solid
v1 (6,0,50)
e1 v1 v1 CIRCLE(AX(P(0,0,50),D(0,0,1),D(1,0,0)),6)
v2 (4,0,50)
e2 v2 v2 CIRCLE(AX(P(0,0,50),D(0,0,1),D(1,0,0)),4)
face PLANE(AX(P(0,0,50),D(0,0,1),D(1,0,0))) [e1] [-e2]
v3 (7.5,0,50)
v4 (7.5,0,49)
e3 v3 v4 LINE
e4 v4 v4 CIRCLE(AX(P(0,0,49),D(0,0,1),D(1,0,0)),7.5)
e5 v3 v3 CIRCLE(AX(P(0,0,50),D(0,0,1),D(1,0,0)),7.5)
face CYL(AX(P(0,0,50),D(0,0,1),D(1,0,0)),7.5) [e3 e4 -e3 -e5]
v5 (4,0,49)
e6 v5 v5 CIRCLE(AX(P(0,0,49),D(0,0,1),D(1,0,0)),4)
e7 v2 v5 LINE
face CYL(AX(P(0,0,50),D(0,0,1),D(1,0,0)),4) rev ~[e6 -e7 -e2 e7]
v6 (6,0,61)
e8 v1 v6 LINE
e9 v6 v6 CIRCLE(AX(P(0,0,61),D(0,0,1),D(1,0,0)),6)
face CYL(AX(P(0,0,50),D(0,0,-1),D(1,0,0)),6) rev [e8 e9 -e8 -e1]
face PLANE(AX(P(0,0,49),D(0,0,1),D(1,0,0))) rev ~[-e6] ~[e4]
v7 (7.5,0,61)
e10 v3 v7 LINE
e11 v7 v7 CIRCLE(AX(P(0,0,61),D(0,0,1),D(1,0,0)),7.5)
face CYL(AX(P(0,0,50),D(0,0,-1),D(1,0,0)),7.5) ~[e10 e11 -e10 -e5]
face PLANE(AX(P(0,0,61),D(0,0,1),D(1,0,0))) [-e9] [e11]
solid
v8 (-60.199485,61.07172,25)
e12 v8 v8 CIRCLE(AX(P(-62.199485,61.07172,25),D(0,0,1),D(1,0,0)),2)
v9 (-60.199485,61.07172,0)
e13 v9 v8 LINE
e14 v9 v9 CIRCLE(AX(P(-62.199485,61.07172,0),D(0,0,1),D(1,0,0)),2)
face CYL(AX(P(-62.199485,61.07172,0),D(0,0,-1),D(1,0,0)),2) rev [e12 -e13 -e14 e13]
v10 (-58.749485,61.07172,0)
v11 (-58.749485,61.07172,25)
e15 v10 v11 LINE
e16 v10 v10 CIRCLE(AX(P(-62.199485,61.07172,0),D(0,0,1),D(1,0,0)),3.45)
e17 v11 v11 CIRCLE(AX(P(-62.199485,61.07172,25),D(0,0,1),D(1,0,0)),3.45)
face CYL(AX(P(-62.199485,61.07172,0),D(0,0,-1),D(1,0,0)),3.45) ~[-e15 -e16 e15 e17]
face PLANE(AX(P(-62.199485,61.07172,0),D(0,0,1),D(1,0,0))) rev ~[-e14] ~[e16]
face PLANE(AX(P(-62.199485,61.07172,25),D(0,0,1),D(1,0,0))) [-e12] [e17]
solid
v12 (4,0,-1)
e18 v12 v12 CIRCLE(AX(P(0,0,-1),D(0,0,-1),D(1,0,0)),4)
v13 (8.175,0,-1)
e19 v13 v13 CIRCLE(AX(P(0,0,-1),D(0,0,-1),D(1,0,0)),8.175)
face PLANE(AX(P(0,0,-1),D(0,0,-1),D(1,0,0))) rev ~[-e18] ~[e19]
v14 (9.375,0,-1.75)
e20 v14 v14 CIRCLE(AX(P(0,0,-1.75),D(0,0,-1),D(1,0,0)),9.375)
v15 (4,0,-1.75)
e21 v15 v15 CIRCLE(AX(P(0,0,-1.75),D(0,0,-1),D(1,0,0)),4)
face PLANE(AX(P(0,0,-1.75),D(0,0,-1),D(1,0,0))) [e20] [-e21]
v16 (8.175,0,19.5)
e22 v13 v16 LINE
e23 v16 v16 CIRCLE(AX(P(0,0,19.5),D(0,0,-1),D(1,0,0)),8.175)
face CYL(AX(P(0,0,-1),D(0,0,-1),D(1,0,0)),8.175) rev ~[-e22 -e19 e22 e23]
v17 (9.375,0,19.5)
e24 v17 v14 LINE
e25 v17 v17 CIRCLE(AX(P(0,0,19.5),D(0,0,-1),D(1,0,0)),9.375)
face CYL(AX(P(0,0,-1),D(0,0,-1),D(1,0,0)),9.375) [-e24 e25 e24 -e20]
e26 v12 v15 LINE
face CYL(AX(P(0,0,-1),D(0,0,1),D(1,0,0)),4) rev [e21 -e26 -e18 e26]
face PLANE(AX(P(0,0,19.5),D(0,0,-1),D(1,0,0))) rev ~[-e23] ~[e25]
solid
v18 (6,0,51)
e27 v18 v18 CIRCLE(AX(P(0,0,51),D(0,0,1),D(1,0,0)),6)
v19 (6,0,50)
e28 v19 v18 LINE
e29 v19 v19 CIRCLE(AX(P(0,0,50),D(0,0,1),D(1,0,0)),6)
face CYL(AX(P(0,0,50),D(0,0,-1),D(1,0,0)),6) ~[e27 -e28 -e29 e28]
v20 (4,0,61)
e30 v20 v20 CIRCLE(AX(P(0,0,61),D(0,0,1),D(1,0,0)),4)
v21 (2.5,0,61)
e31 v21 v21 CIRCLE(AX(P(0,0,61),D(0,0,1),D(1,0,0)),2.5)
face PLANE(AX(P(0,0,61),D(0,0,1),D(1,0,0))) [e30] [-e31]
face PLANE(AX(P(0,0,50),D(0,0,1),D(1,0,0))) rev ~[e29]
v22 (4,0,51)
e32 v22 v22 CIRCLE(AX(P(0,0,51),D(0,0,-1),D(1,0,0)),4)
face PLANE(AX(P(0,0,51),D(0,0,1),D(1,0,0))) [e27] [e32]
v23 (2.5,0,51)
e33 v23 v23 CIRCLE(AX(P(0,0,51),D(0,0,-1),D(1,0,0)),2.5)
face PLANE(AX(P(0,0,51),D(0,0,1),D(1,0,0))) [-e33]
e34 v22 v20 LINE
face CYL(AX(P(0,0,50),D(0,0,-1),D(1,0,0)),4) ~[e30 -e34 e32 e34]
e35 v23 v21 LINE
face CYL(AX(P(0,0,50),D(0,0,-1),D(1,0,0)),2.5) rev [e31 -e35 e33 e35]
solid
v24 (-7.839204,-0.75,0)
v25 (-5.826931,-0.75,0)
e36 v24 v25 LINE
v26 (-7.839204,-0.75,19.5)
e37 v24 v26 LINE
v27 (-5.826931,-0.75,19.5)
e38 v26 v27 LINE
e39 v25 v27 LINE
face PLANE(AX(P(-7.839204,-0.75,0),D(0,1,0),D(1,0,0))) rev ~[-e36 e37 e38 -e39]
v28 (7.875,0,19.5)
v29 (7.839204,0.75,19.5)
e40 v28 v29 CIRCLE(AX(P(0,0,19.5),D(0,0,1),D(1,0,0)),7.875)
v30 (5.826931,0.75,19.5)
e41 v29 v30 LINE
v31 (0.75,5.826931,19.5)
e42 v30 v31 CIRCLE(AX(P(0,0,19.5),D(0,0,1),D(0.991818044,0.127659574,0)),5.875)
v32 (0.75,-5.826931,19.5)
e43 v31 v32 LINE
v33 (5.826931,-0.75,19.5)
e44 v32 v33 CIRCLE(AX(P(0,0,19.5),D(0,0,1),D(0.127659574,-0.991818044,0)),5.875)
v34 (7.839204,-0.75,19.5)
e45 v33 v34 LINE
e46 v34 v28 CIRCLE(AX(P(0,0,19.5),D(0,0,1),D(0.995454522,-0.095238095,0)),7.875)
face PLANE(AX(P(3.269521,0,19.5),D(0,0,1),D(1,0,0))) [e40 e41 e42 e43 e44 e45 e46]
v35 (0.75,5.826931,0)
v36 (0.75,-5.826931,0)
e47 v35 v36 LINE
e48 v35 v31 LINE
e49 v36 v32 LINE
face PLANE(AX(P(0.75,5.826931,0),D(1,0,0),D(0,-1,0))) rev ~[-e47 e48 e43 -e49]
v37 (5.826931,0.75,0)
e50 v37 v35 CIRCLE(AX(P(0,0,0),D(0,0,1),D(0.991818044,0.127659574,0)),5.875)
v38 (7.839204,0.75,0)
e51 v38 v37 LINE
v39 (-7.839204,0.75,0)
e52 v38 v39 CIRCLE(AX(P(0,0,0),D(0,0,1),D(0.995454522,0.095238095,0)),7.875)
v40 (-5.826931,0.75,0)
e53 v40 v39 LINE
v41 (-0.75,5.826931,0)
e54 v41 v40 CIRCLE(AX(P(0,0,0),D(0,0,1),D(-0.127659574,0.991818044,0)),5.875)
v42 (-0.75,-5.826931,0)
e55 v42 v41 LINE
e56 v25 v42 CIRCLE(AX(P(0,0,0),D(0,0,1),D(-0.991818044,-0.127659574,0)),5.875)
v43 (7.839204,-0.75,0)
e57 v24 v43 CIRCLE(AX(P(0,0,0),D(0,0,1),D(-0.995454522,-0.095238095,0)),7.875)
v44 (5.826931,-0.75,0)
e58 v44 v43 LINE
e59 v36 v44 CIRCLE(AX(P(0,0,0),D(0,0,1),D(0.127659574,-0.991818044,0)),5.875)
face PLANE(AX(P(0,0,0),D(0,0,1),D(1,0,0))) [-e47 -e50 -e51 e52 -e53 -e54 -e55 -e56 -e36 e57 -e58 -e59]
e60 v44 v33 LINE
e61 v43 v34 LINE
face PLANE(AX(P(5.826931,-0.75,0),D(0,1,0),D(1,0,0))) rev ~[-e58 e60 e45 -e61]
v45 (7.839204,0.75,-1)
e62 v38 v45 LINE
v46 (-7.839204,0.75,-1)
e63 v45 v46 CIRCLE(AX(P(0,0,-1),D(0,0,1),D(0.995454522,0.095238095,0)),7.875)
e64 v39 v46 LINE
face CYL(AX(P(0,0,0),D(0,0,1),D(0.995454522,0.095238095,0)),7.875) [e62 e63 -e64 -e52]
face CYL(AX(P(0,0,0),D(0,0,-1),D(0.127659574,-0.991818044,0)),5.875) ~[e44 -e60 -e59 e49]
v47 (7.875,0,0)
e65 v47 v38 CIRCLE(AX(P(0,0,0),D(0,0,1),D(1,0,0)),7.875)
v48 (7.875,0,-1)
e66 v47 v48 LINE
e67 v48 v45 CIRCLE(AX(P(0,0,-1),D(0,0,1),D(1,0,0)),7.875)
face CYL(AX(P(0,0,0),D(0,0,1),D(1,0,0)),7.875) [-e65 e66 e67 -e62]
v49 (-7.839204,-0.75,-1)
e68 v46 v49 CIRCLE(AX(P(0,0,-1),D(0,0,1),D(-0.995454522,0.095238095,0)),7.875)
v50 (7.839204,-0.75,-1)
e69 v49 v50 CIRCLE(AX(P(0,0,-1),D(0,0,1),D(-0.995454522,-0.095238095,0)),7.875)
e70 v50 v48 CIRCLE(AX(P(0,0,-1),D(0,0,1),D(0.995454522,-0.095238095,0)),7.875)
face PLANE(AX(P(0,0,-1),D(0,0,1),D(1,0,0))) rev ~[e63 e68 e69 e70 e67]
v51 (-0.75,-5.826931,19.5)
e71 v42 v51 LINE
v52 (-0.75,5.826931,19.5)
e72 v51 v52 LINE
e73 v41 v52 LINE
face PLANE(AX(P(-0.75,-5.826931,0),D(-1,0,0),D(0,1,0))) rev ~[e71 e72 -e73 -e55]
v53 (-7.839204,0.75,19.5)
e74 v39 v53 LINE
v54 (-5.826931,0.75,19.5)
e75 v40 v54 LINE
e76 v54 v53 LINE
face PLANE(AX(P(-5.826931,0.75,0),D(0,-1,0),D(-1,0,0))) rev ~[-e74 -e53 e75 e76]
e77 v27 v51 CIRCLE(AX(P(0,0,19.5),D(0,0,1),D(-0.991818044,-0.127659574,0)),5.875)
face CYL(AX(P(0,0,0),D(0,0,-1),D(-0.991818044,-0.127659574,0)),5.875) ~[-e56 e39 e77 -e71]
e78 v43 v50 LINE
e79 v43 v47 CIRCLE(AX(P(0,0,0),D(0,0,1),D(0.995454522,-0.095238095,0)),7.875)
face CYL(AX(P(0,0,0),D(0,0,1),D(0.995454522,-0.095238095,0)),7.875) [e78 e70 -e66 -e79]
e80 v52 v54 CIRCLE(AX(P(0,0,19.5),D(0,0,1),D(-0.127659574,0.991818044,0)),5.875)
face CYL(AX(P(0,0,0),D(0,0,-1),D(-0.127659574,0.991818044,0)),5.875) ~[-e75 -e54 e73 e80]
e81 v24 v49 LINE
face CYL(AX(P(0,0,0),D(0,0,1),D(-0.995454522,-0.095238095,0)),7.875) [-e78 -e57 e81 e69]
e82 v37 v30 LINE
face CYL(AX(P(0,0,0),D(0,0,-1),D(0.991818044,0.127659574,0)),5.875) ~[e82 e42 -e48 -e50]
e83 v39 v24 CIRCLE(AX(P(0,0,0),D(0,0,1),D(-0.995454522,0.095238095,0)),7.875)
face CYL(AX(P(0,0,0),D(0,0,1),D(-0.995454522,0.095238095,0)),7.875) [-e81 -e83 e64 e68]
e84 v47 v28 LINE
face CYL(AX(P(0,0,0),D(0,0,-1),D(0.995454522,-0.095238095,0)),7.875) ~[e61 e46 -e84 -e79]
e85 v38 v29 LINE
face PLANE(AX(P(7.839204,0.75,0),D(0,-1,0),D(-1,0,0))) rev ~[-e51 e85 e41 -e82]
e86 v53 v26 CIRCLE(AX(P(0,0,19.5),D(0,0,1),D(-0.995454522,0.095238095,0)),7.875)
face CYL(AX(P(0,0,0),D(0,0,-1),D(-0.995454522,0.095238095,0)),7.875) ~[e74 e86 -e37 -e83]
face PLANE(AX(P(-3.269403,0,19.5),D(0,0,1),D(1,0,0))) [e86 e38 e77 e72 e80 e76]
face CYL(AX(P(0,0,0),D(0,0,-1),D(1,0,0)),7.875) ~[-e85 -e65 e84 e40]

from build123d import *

# Parameters (mm, degrees)
F2_DEPTH  = 19.5
F3_DEPTH  = 1
F4_R      = 9.375
F4_R_2    = 8.175
F4_R_3    = 7.875
F4_R_4    = 4
F5_DEPTH  = 0.75
F6_DEPTH  = 20.5
F8_R      = 7.5
F8_R_2    = 6
F8_R_3    = 4
F9_DEPTH  = 1
F10_DEPTH = 11
F12_DEPTH = 1
F11_R     = 4
F11_R_2   = 2.5
F13_DEPTH = 11
F14_R     = 3.45
F14_R_2   = 2
F15_DEPTH = 25


with BuildPart() as f2:
    # F1 (on Top) → F2 (new body)
    with BuildSketch(Plane.XY):
        with BuildLine():
            Line((-5.8269310104, 0.75), (-7.8392043601, 0.75))
            ThreePointArc((-7.8392043601, 0.75), (-7.875, 0), (-7.8392043601, -0.75))
            Line((-7.8392043601, -0.75), (-5.8269310104, -0.75))
            ThreePointArc((-5.8269310104, -0.75), (-4.1542523395, -4.1542523395), (-0.75, -5.8269310104))
            Line((-0.75, -5.8269310104), (-0.75, 5.8269310104))
            ThreePointArc((-0.75, 5.8269310104), (-4.1542523395, 4.1542523395), (-5.8269310104, 0.75))
        make_face()
    extrude(amount=F2_DEPTH)



with BuildPart() as f2b:
    # F1 (on Top) → F2, piece 2 (new body)
    with BuildSketch(Plane.XY):
        with BuildLine():
            ThreePointArc((7.8392043601, -0.75), (7.8660459996, -0.3754268663), (7.875, 0))
            ThreePointArc((7.875, 0), (7.8660459996, 0.3754268663), (7.8392043601, 0.75))
            Line((7.8392043601, 0.75), (5.8269310104, 0.75))
            ThreePointArc((5.8269310104, 0.75), (4.1542523395, 4.1542523395), (0.75, 5.8269310104))
            Line((0.75, 5.8269310104), (0.75, -5.8269310104))
            ThreePointArc((0.75, -5.8269310104), (4.1542523395, -4.1542523395), (5.8269310104, -0.75))
            Line((5.8269310104, -0.75), (7.8392043601, -0.75))
        make_face()
    extrude(amount=F2_DEPTH)


with BuildPart() as f2_1:
    add(f2.part)

    add(f2b.part)  # F3 merges F2b
    # F1 (on Top) → F3 (join)
    with BuildSketch(Plane.XY):
        with BuildLine():
            Line((5.8269310104, 0.75), (7.8392043601, 0.75))
            ThreePointArc((7.8392043601, 0.75), (0, 7.875), (-7.8392043601, 0.75))
            Line((-7.8392043601, 0.75), (-5.8269310104, 0.75))
            ThreePointArc((-5.8269310104, 0.75), (-4.1542523395, 4.1542523395), (-0.75, 5.8269310104))
            Line((-0.75, 5.8269310104), (-0.75, -5.8269310104))
            ThreePointArc((-0.75, -5.8269310104), (-4.1542523395, -4.1542523395), (-5.8269310104, -0.75))
            Line((-5.8269310104, -0.75), (-7.8392043601, -0.75))
            ThreePointArc((-7.8392043601, -0.75), (0, -7.875), (7.8392043601, -0.75))
            Line((7.8392043601, -0.75), (5.8269310104, -0.75))
            ThreePointArc((5.8269310104, -0.75), (4.1542523395, -4.1542523395), (0.75, -5.8269310104))
            Line((0.75, -5.8269310104), (0.75, 5.8269310104))
            ThreePointArc((0.75, 5.8269310104), (4.1542523395, 4.1542523395), (5.8269310104, 0.75))
        make_face()
        with BuildLine():
            Line((-5.8269310104, 0.75), (-7.8392043601, 0.75))
            ThreePointArc((-7.8392043601, 0.75), (-7.875, 0), (-7.8392043601, -0.75))
            Line((-7.8392043601, -0.75), (-5.8269310104, -0.75))
            ThreePointArc((-5.8269310104, -0.75), (-4.1542523395, -4.1542523395), (-0.75, -5.8269310104))
            Line((-0.75, -5.8269310104), (-0.75, 5.8269310104))
            ThreePointArc((-0.75, 5.8269310104), (-4.1542523395, 4.1542523395), (-5.8269310104, 0.75))
        make_face()
        with BuildLine():
            ThreePointArc((7.8392043601, -0.75), (7.8660459996, -0.3754268663), (7.875, 0))
            ThreePointArc((7.875, 0), (7.8660459996, 0.3754268663), (7.8392043601, 0.75))
            Line((7.8392043601, 0.75), (5.8269310104, 0.75))
            ThreePointArc((5.8269310104, 0.75), (4.1542523395, 4.1542523395), (0.75, 5.8269310104))
            Line((0.75, 5.8269310104), (0.75, -5.8269310104))
            ThreePointArc((0.75, -5.8269310104), (4.1542523395, -4.1542523395), (5.8269310104, -0.75))
            Line((5.8269310104, -0.75), (7.8392043601, -0.75))
        make_face()
    extrude(amount=-F3_DEPTH)


with BuildPart() as f5:
    # F4 (on face) → F5 (new body)
    with BuildSketch(Plane(origin=(0, 0, -1), x_dir=(1, 0, 0), z_dir=(0, 0, -1))):
        Circle(F4_R)
        Circle(F4_R_2, mode=Mode.SUBTRACT)
        Circle(F4_R_2)
        Circle(F4_R_3, mode=Mode.SUBTRACT)
        Circle(F4_R_3)
        Circle(F4_R_4, mode=Mode.SUBTRACT)
    extrude(amount=F5_DEPTH)

    # F4 (on face) → F6 (join)
    with BuildSketch(Plane(origin=(0, 0, -1), x_dir=(1, 0, 0), z_dir=(0, 0, -1))):
        Circle(F4_R)
        Circle(F4_R_2, mode=Mode.SUBTRACT)
    extrude(amount=-F6_DEPTH)


with BuildPart() as f9:
    # F8 (on offset) → F9 (new body)
    with BuildSketch(Plane.XY.offset(50)):
        Circle(F8_R)
        Circle(F8_R_2, mode=Mode.SUBTRACT)
        Circle(F8_R_2)
        Circle(F8_R_3, mode=Mode.SUBTRACT)
    extrude(amount=-F9_DEPTH)

    # F8 (on offset) → F10 (join)
    with BuildSketch(Plane.XY.offset(50)):
        Circle(F8_R)
        Circle(F8_R_2, mode=Mode.SUBTRACT)
    extrude(amount=F10_DEPTH)


with BuildPart() as f12:
    # F8 (on offset) → F12 (new body)
    with BuildSketch(Plane.XY.offset(50)):
        Circle(F8_R_2)
        Circle(F8_R_3, mode=Mode.SUBTRACT)
        Circle(F8_R_3)
    extrude(amount=F12_DEPTH)

    # F11 (on offset) → F13 (join)
    with BuildSketch(Plane.XY.offset(50)):
        Circle(F11_R)
        Circle(F11_R_2, mode=Mode.SUBTRACT)
    extrude(amount=F13_DEPTH)


with BuildPart() as f15:
    # F14 (on Top) → F15 (new body)
    with BuildSketch(Plane.XY):
        with Locations((-62.1994845569, 61.0717199743)):
            Circle(F14_R)
        with Locations((-62.1994845569, 61.0717199743)):
            Circle(F14_R_2, mode=Mode.SUBTRACT)
    extrude(amount=F15_DEPTH)


solid = Compound([f2_1.part, f5.part, f9.part, f12.part, f15.part])
